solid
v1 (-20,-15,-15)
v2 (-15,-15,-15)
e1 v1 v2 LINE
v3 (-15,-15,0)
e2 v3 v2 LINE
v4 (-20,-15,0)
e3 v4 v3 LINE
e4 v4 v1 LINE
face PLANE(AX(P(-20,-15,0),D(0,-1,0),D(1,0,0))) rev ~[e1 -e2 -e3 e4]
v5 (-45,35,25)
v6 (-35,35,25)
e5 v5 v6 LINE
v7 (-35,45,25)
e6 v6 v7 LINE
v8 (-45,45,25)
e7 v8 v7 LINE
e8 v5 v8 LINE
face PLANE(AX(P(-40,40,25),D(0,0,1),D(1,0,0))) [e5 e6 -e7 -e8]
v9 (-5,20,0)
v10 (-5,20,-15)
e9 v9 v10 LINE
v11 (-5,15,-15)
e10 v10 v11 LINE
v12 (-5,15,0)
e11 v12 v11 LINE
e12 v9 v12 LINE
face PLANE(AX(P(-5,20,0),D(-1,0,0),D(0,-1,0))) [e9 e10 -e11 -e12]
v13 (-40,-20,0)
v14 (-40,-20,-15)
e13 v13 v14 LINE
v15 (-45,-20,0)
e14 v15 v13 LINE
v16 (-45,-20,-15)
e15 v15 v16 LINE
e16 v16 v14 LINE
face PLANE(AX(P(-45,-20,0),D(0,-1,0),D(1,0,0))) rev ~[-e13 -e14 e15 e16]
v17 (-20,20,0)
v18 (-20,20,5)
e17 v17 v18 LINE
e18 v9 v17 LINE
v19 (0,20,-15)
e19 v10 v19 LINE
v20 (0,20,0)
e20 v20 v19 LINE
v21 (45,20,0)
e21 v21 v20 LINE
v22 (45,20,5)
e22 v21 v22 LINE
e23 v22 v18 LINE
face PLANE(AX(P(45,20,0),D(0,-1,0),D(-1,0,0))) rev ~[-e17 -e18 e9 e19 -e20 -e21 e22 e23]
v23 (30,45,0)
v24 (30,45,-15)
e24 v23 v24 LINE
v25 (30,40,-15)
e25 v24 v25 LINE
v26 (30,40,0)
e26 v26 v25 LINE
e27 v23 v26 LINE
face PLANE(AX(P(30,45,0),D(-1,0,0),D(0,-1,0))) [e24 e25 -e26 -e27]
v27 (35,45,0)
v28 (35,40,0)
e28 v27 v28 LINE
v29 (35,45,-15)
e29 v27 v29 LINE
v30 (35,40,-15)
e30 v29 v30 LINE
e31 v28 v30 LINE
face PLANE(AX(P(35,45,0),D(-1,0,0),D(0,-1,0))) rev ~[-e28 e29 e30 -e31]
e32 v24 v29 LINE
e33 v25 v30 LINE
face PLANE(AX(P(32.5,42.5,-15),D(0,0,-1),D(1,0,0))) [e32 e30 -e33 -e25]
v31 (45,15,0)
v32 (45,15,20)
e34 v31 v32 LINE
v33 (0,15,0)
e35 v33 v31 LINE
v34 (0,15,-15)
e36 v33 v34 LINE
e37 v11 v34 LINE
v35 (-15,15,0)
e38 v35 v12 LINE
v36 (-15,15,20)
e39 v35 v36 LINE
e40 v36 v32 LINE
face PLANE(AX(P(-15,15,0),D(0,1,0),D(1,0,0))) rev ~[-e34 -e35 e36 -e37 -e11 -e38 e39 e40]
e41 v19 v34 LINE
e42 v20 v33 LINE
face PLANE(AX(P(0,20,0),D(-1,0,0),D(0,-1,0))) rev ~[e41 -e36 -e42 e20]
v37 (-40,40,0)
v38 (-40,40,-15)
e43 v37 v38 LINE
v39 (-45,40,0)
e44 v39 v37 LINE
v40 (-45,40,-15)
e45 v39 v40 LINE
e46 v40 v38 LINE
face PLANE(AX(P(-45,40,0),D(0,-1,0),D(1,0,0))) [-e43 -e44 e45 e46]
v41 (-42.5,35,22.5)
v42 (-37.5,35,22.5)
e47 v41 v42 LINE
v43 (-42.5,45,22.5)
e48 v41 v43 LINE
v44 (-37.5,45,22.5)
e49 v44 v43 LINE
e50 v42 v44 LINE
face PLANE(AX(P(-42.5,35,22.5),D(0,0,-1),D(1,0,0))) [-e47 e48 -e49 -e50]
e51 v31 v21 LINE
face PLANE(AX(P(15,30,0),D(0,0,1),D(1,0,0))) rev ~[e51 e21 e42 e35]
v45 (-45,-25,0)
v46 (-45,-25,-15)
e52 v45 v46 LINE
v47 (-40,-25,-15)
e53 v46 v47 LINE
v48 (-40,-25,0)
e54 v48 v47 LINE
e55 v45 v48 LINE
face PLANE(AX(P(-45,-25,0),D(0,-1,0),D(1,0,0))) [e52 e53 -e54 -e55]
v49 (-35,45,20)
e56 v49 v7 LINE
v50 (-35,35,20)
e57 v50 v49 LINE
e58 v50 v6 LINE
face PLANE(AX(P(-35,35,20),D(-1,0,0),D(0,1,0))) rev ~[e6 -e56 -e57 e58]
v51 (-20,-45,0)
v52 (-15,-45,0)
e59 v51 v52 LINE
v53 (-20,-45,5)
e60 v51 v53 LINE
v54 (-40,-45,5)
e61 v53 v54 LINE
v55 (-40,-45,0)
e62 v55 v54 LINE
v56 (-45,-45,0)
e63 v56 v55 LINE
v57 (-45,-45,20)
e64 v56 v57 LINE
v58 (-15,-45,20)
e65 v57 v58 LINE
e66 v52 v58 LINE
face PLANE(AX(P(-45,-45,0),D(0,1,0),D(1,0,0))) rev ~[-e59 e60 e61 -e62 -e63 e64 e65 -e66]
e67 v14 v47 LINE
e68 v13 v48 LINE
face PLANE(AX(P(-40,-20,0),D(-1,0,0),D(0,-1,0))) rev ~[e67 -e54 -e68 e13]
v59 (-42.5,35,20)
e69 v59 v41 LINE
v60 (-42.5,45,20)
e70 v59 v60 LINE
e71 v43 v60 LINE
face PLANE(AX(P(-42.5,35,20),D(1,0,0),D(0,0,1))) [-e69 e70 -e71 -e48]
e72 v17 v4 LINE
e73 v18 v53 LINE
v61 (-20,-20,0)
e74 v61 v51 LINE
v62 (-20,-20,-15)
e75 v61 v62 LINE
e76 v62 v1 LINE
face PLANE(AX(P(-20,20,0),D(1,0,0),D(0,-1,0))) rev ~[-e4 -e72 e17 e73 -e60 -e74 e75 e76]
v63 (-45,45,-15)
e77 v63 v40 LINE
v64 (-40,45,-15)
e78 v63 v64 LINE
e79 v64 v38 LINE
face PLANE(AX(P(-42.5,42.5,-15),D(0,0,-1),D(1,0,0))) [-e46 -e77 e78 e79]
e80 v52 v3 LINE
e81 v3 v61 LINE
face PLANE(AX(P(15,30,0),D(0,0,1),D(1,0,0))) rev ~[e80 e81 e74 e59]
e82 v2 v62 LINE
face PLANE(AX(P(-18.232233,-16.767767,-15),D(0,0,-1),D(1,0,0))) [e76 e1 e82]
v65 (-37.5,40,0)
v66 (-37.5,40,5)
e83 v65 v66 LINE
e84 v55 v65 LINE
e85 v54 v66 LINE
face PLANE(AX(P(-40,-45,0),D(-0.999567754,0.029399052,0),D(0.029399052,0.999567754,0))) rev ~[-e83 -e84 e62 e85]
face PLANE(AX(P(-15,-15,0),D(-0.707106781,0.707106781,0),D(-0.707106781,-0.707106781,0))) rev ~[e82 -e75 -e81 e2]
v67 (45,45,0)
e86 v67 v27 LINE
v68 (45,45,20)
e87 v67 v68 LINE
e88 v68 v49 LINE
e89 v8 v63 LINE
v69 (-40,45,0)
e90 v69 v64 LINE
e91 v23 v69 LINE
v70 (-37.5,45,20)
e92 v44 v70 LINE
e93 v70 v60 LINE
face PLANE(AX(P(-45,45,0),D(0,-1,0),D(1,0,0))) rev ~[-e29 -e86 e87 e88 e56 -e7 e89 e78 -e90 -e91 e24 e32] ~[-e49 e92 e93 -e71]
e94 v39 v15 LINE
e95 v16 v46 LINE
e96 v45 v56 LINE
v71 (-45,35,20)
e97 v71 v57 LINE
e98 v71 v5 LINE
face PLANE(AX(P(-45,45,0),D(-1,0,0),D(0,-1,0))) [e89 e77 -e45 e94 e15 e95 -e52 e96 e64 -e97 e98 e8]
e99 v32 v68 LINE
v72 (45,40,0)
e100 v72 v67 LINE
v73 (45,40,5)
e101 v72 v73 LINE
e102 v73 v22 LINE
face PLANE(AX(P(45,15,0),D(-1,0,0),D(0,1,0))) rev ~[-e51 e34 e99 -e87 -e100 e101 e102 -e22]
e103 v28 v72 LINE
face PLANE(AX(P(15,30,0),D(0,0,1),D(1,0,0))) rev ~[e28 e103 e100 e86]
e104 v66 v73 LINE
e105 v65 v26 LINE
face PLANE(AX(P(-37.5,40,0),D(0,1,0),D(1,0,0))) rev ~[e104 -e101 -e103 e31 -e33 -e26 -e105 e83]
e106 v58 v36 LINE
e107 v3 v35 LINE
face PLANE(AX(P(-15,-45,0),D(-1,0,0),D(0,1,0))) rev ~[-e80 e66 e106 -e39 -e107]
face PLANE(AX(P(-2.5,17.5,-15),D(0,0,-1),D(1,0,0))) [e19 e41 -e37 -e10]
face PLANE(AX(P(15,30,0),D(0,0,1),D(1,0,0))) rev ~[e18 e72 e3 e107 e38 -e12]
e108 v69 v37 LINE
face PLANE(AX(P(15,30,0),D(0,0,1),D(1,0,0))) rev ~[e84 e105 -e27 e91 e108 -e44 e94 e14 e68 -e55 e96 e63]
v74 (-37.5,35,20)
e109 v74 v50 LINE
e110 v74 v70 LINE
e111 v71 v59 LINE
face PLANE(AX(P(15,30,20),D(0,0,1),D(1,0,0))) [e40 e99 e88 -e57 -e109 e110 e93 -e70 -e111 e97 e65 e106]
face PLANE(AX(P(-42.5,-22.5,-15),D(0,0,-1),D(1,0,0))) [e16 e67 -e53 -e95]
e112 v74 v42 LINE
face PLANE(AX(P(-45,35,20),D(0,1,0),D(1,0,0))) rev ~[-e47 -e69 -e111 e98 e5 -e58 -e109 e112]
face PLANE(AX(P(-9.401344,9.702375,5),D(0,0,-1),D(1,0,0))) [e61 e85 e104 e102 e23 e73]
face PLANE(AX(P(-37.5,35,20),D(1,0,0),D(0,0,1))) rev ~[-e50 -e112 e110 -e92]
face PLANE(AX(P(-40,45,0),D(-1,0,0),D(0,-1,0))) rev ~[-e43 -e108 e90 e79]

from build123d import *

# Parameters (mm, degrees)
F0_W      = 60
F0_H      = 30
F0_W_2    = 30
F0_H_2    = 60
F1_DEPTH  = 20
F3_DEPTH  = 5
F4_W      = 5
F4_H      = 5
F5_DEPTH  = 15
F6_W      = 5
F6_H      = 5
F7_DEPTH  = 15
F8_DEPTH  = 15
F9_W      = 5
F9_H      = 5
F10_DEPTH = 15
F11_W     = 10
F11_H     = 10
F12_DEPTH = 5
F13_W     = 5
F13_H     = 2.5
F14_DEPTH = 40
F15_DEPTH = 15


# Not quite as in the source:
# - a feature names something its author has since deleted; it is built from what else it names


with BuildPart() as f1:
    # F0 (on Top) → F1 (new body)
    with BuildSketch(Plane.XY):
        with Locations((15, 30)):
            Rectangle(F0_W, F0_H)
        with Locations((-30, 30)):
            Rectangle(F0_W_2, F0_H)
        with Locations((-30, -15)):
            Rectangle(F0_W_2, F0_H_2)
    extrude(amount=F1_DEPTH)

    # F2 (on face) → F3 (cut)
    with BuildSketch(Plane(origin=(0, 0, 0), x_dir=(1, 0, 0), z_dir=(0, 0, -1))):
        Polygon((-13.218164444, -40), (45, -40), (45, -20), (-15, -20), (-20, -20), (-20, -15), (-20, 3.0019930564), (-20, 45), (-40, 45), (-37.5, -40), align=None)
    extrude(amount=-F3_DEPTH, mode=Mode.SUBTRACT)

    # F4 (on face) → F5 (join)
    with BuildSketch(Plane(origin=(0, 0, 0), x_dir=(1, 0, 0), z_dir=(0, 0, -1))):
        with Locations((32.5, -42.5)):
            Rectangle(F4_W, F4_H)
    extrude(amount=F5_DEPTH)

    # F6 (on face) → F7 (join)
    with BuildSketch(Plane(origin=(0, 0, 0), x_dir=(1, 0, 0), z_dir=(0, 0, -1))):
        with Locations((-2.5, -17.5)):
            Rectangle(F6_W, F6_H)
    extrude(amount=F7_DEPTH)

    # F6 (on face) → F8 (join)
    with BuildSketch(Plane(origin=(0, 0, 0), x_dir=(1, 0, 0), z_dir=(0, 0, -1))):
        Polygon((-20, 20), (-20, 15), (-15, 15), align=None)
    extrude(amount=F8_DEPTH)

    # F9 (on face) → F10 (join)
    with BuildSketch(Plane(origin=(0, 0, 0), x_dir=(1, 0, 0), z_dir=(0, 0, -1))):
        with Locations((-42.5, 22.5)):
            Rectangle(F9_W, F9_H)
    extrude(amount=F10_DEPTH)

    # F11 (on face) → F12 (join)
    with BuildSketch(Plane.XY.offset(20)):
        with Locations((-40, 40)):
            Rectangle(F11_W, F11_H)
    extrude(amount=F12_DEPTH)

    # F13 (on face) → F14 (cut)
    with BuildSketch(Plane.XZ.offset(-35)):
        with Locations((-40, 21.25)):
            Rectangle(F13_W, F13_H)
    extrude(amount=-F14_DEPTH, mode=Mode.SUBTRACT)

    # F4 (on face) → F15 (join)
    with BuildSketch(Plane(origin=(0, 0, 0), x_dir=(1, 0, 0), z_dir=(0, 0, -1))):
        with Locations((-42.5, -42.5)):
            Rectangle(F4_W, F4_H)
    extrude(amount=F15_DEPTH)


solid = f1.part
